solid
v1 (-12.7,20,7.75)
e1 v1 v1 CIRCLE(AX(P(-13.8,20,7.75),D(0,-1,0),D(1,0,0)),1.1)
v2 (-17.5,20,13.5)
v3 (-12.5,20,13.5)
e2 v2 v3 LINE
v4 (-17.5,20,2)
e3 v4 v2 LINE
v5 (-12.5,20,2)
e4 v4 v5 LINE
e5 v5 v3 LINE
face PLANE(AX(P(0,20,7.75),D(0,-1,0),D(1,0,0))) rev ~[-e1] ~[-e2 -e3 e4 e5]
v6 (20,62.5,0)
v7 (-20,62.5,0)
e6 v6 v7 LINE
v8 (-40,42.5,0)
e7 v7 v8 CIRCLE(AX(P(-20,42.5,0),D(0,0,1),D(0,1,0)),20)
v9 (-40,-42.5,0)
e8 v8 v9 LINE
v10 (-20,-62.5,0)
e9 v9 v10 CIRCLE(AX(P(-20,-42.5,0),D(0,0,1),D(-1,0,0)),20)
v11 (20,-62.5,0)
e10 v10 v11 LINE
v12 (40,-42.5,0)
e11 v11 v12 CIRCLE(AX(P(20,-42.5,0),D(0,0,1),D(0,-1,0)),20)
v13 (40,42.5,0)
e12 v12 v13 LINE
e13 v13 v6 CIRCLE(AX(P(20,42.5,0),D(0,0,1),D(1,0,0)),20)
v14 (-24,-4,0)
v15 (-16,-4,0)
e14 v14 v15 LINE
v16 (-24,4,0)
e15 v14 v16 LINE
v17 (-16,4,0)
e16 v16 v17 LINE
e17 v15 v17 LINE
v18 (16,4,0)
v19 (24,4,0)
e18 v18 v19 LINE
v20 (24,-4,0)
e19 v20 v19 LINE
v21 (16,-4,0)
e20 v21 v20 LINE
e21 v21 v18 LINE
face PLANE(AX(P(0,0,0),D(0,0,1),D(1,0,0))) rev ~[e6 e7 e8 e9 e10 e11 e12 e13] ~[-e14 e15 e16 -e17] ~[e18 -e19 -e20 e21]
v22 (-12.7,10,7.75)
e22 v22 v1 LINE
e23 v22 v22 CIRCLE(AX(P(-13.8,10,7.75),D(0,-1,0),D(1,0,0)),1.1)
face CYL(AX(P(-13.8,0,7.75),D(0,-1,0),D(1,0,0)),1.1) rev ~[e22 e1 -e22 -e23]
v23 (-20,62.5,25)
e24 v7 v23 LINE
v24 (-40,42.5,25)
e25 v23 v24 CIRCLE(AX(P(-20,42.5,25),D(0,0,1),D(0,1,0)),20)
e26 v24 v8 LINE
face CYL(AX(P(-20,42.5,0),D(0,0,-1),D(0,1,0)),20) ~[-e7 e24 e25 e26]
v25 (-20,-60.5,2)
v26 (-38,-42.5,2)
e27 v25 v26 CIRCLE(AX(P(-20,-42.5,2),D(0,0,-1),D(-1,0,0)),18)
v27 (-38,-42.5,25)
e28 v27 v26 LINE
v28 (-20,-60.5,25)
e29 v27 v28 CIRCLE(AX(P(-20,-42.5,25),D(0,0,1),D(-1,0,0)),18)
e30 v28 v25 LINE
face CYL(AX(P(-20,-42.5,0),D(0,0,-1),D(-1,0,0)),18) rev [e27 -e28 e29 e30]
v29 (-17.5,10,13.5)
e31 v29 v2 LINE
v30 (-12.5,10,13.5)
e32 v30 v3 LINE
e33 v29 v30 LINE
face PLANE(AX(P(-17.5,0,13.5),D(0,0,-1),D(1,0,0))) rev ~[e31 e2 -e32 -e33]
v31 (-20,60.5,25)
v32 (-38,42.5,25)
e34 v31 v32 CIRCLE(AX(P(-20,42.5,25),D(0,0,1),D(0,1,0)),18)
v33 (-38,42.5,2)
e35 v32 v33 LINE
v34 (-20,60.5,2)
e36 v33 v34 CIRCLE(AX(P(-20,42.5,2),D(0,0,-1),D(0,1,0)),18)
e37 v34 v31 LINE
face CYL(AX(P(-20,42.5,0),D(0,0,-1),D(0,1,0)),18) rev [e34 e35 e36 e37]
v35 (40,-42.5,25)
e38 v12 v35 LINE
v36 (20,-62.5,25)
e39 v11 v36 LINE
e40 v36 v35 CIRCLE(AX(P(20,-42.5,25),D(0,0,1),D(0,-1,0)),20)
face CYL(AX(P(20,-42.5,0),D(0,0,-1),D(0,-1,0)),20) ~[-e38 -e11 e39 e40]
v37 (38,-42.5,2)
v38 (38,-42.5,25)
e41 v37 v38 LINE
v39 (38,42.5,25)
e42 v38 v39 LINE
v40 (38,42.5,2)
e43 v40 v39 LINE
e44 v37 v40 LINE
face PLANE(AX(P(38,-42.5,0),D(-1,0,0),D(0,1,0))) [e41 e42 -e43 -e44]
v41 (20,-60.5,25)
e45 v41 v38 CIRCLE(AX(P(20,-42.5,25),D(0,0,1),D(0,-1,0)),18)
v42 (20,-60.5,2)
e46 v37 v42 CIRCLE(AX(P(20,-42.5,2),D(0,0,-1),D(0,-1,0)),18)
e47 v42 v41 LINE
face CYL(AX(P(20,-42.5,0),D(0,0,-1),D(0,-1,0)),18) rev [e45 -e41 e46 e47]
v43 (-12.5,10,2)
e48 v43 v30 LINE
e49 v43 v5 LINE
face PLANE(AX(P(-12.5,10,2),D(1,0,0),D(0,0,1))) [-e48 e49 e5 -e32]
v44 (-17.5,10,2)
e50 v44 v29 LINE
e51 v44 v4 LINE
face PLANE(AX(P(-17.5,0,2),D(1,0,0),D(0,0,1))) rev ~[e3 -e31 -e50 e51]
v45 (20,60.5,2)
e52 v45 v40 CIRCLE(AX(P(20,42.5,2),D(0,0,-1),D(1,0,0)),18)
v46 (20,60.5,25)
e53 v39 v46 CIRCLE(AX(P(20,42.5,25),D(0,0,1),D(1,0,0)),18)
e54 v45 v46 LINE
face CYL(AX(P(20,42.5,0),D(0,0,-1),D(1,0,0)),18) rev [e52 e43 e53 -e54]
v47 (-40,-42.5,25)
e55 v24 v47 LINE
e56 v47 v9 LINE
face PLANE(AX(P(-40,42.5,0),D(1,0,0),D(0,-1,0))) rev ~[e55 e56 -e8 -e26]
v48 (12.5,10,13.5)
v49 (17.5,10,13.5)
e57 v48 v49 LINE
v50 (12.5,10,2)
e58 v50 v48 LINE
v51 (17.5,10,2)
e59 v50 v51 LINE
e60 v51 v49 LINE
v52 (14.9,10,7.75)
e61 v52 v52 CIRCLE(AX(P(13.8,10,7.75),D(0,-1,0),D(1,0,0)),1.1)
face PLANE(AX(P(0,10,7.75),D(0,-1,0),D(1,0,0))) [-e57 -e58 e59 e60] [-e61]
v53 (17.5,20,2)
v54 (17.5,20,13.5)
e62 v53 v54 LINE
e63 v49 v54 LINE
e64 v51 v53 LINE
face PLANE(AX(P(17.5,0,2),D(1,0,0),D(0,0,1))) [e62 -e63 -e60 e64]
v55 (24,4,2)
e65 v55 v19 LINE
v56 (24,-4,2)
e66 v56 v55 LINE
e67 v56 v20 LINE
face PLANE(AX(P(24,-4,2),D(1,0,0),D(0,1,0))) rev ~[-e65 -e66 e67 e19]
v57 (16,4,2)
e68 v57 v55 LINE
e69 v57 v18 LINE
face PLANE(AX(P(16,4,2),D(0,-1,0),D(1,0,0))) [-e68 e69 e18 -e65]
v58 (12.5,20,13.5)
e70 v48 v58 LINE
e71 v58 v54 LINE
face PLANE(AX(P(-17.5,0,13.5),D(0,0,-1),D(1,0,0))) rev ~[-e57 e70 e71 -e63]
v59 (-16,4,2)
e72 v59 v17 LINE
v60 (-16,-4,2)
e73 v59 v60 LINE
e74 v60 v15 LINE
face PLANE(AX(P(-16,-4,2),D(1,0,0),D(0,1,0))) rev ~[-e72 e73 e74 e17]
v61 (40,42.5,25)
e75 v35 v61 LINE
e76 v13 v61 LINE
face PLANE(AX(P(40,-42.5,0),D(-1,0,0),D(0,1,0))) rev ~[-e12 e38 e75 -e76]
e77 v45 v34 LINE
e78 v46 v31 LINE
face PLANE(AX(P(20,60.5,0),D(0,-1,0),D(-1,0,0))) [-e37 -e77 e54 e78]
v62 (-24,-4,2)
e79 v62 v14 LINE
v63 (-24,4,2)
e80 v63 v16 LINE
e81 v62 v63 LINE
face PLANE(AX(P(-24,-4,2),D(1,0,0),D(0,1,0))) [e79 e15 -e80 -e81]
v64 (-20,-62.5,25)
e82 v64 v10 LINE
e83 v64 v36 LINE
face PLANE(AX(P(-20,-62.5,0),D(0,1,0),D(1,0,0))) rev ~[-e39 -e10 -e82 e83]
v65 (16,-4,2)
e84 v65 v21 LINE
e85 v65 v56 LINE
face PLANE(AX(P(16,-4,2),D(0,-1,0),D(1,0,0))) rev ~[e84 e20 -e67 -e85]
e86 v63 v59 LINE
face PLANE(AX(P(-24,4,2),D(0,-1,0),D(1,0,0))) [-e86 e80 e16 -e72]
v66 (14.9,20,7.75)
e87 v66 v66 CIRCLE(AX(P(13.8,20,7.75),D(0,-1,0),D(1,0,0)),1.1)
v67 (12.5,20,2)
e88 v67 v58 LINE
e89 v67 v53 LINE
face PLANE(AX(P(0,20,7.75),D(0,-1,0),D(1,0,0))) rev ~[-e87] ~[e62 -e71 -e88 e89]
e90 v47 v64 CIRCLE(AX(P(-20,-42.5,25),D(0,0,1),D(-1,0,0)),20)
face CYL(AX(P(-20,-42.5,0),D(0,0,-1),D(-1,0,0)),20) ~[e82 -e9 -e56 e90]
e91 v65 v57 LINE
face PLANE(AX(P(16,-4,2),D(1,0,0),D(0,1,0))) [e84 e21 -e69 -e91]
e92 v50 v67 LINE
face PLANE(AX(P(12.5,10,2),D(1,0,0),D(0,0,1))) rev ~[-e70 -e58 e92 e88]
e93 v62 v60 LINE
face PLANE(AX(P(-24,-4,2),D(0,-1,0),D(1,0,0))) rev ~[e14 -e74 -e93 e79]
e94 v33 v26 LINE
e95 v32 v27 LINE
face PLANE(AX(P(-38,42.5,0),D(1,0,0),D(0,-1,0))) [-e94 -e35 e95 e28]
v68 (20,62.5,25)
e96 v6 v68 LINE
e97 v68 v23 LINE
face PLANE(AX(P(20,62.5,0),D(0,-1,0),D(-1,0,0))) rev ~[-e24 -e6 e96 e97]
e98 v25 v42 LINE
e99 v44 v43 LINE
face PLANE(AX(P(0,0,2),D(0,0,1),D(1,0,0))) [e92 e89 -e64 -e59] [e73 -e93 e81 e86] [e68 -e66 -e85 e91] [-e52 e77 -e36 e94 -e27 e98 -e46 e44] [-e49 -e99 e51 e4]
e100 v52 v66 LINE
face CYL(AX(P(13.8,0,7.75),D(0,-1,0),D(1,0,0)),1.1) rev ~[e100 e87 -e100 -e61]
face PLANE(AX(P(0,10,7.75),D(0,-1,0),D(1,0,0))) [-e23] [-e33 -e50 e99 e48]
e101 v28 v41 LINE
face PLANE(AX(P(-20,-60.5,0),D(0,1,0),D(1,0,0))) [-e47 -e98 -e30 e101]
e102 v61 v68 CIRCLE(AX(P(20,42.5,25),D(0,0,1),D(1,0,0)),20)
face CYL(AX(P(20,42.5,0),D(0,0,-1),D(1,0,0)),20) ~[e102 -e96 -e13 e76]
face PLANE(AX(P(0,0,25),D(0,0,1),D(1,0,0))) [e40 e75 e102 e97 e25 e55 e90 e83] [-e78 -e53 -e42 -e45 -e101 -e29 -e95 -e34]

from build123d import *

# Parameters (mm, degrees)
F1_DEPTH  = 2
F2_DEPTH  = 25
F3_T      = -2
F4_W      = 8
F4_H      = 8
F5_DEPTH  = 25
F6_W      = 35
F6_H      = 11.5
F6_R      = 1.1
F7_DEPTH  = 30
F8_DEPTH  = 10
F9_W      = 25
F9_H      = 11.5
F10_DEPTH = 25
F11_DEPTH = 10


# Not quite as in the source:
# - a feature names something its author has since deleted; it is built from what else it names


with BuildPart() as f1:
    # F0 (on Top) → F1 (new body)
    with BuildSketch(Plane.XY):
        with BuildLine():
            Line((-20, -62.5), (20, -62.5))
            ThreePointArc((20, -62.5), (34.1421356237, -56.6421356237), (40, -42.5))
            Line((40, -42.5), (40, 42.5))
            ThreePointArc((40, 42.5), (34.1421356237, 56.6421356237), (20, 62.5))
            Line((20, 62.5), (-20, 62.5))
            ThreePointArc((-20, 62.5), (-34.1421356237, 56.6421356237), (-40, 42.5))
            Line((-40, 42.5), (-40, -42.5))
            ThreePointArc((-40, -42.5), (-34.1421356237, -56.6421356237), (-20, -62.5))
        make_face()
    extrude(amount=F1_DEPTH)

    # F0 (on Top) → F2 (join)
    with BuildSketch(Plane.XY):
        with BuildLine():
            Line((-20, -62.5), (20, -62.5))
            ThreePointArc((20, -62.5), (34.1421356237, -56.6421356237), (40, -42.5))
            Line((40, -42.5), (40, 42.5))
            ThreePointArc((40, 42.5), (34.1421356237, 56.6421356237), (20, 62.5))
            Line((20, 62.5), (-20, 62.5))
            ThreePointArc((-20, 62.5), (-34.1421356237, 56.6421356237), (-40, 42.5))
            Line((-40, 42.5), (-40, -42.5))
            ThreePointArc((-40, -42.5), (-34.1421356237, -56.6421356237), (-20, -62.5))
        make_face()
    extrude(amount=F2_DEPTH)

    # F3
    f3_openings = [f1.faces().sort_by_distance(p)[0] for p in [
        (0, 0, 25),
    ]]
    offset(amount=F3_T, openings=f3_openings)

    # F4 (on face) → F5 (cut)
    with BuildSketch(Plane.XY.offset(2)):
        with Locations((20, 0)):
            Rectangle(F4_W, F4_H)
        with Locations((-20, 0)):
            Rectangle(F4_W, F4_H)
    extrude(amount=-F5_DEPTH, mode=Mode.SUBTRACT)

    # F6 (on Front) → F7 (join)
    with BuildSketch(Plane.XZ):
        with Locations((0, 7.75)):
            Rectangle(F6_W, F6_H)
        with Locations((-13.8, 7.75)):
            Circle(F6_R, mode=Mode.SUBTRACT)
        with Locations((13.8, 7.75)):
            Circle(F6_R, mode=Mode.SUBTRACT)
    extrude(amount=-F7_DEPTH)

    # F8 (cut): a face of the model
    f8_faces = [f1.faces().sort_by_distance(p)[0] for p in [
        (0, 0, 7.75),
    ]]
    extrude(f8_faces, amount=-F8_DEPTH, mode=Mode.SUBTRACT)

    # F9 (on face) → F10 (cut)
    with BuildSketch(Plane.XZ.offset(-10)):
        with Locations((0, 7.75)):
            Rectangle(F9_W, F9_H)
    extrude(amount=-F10_DEPTH, mode=Mode.SUBTRACT)

    # F11 (cut): faces of the model
    f11_faces = [f1.faces().sort_by_distance(p)[0] for p in [
        (15.0849479566, 30, 7.75),
        (-15.0849479566, 30, 7.75),
    ]]
    extrude(f11_faces, amount=-F11_DEPTH, mode=Mode.SUBTRACT)


solid = f1.part
